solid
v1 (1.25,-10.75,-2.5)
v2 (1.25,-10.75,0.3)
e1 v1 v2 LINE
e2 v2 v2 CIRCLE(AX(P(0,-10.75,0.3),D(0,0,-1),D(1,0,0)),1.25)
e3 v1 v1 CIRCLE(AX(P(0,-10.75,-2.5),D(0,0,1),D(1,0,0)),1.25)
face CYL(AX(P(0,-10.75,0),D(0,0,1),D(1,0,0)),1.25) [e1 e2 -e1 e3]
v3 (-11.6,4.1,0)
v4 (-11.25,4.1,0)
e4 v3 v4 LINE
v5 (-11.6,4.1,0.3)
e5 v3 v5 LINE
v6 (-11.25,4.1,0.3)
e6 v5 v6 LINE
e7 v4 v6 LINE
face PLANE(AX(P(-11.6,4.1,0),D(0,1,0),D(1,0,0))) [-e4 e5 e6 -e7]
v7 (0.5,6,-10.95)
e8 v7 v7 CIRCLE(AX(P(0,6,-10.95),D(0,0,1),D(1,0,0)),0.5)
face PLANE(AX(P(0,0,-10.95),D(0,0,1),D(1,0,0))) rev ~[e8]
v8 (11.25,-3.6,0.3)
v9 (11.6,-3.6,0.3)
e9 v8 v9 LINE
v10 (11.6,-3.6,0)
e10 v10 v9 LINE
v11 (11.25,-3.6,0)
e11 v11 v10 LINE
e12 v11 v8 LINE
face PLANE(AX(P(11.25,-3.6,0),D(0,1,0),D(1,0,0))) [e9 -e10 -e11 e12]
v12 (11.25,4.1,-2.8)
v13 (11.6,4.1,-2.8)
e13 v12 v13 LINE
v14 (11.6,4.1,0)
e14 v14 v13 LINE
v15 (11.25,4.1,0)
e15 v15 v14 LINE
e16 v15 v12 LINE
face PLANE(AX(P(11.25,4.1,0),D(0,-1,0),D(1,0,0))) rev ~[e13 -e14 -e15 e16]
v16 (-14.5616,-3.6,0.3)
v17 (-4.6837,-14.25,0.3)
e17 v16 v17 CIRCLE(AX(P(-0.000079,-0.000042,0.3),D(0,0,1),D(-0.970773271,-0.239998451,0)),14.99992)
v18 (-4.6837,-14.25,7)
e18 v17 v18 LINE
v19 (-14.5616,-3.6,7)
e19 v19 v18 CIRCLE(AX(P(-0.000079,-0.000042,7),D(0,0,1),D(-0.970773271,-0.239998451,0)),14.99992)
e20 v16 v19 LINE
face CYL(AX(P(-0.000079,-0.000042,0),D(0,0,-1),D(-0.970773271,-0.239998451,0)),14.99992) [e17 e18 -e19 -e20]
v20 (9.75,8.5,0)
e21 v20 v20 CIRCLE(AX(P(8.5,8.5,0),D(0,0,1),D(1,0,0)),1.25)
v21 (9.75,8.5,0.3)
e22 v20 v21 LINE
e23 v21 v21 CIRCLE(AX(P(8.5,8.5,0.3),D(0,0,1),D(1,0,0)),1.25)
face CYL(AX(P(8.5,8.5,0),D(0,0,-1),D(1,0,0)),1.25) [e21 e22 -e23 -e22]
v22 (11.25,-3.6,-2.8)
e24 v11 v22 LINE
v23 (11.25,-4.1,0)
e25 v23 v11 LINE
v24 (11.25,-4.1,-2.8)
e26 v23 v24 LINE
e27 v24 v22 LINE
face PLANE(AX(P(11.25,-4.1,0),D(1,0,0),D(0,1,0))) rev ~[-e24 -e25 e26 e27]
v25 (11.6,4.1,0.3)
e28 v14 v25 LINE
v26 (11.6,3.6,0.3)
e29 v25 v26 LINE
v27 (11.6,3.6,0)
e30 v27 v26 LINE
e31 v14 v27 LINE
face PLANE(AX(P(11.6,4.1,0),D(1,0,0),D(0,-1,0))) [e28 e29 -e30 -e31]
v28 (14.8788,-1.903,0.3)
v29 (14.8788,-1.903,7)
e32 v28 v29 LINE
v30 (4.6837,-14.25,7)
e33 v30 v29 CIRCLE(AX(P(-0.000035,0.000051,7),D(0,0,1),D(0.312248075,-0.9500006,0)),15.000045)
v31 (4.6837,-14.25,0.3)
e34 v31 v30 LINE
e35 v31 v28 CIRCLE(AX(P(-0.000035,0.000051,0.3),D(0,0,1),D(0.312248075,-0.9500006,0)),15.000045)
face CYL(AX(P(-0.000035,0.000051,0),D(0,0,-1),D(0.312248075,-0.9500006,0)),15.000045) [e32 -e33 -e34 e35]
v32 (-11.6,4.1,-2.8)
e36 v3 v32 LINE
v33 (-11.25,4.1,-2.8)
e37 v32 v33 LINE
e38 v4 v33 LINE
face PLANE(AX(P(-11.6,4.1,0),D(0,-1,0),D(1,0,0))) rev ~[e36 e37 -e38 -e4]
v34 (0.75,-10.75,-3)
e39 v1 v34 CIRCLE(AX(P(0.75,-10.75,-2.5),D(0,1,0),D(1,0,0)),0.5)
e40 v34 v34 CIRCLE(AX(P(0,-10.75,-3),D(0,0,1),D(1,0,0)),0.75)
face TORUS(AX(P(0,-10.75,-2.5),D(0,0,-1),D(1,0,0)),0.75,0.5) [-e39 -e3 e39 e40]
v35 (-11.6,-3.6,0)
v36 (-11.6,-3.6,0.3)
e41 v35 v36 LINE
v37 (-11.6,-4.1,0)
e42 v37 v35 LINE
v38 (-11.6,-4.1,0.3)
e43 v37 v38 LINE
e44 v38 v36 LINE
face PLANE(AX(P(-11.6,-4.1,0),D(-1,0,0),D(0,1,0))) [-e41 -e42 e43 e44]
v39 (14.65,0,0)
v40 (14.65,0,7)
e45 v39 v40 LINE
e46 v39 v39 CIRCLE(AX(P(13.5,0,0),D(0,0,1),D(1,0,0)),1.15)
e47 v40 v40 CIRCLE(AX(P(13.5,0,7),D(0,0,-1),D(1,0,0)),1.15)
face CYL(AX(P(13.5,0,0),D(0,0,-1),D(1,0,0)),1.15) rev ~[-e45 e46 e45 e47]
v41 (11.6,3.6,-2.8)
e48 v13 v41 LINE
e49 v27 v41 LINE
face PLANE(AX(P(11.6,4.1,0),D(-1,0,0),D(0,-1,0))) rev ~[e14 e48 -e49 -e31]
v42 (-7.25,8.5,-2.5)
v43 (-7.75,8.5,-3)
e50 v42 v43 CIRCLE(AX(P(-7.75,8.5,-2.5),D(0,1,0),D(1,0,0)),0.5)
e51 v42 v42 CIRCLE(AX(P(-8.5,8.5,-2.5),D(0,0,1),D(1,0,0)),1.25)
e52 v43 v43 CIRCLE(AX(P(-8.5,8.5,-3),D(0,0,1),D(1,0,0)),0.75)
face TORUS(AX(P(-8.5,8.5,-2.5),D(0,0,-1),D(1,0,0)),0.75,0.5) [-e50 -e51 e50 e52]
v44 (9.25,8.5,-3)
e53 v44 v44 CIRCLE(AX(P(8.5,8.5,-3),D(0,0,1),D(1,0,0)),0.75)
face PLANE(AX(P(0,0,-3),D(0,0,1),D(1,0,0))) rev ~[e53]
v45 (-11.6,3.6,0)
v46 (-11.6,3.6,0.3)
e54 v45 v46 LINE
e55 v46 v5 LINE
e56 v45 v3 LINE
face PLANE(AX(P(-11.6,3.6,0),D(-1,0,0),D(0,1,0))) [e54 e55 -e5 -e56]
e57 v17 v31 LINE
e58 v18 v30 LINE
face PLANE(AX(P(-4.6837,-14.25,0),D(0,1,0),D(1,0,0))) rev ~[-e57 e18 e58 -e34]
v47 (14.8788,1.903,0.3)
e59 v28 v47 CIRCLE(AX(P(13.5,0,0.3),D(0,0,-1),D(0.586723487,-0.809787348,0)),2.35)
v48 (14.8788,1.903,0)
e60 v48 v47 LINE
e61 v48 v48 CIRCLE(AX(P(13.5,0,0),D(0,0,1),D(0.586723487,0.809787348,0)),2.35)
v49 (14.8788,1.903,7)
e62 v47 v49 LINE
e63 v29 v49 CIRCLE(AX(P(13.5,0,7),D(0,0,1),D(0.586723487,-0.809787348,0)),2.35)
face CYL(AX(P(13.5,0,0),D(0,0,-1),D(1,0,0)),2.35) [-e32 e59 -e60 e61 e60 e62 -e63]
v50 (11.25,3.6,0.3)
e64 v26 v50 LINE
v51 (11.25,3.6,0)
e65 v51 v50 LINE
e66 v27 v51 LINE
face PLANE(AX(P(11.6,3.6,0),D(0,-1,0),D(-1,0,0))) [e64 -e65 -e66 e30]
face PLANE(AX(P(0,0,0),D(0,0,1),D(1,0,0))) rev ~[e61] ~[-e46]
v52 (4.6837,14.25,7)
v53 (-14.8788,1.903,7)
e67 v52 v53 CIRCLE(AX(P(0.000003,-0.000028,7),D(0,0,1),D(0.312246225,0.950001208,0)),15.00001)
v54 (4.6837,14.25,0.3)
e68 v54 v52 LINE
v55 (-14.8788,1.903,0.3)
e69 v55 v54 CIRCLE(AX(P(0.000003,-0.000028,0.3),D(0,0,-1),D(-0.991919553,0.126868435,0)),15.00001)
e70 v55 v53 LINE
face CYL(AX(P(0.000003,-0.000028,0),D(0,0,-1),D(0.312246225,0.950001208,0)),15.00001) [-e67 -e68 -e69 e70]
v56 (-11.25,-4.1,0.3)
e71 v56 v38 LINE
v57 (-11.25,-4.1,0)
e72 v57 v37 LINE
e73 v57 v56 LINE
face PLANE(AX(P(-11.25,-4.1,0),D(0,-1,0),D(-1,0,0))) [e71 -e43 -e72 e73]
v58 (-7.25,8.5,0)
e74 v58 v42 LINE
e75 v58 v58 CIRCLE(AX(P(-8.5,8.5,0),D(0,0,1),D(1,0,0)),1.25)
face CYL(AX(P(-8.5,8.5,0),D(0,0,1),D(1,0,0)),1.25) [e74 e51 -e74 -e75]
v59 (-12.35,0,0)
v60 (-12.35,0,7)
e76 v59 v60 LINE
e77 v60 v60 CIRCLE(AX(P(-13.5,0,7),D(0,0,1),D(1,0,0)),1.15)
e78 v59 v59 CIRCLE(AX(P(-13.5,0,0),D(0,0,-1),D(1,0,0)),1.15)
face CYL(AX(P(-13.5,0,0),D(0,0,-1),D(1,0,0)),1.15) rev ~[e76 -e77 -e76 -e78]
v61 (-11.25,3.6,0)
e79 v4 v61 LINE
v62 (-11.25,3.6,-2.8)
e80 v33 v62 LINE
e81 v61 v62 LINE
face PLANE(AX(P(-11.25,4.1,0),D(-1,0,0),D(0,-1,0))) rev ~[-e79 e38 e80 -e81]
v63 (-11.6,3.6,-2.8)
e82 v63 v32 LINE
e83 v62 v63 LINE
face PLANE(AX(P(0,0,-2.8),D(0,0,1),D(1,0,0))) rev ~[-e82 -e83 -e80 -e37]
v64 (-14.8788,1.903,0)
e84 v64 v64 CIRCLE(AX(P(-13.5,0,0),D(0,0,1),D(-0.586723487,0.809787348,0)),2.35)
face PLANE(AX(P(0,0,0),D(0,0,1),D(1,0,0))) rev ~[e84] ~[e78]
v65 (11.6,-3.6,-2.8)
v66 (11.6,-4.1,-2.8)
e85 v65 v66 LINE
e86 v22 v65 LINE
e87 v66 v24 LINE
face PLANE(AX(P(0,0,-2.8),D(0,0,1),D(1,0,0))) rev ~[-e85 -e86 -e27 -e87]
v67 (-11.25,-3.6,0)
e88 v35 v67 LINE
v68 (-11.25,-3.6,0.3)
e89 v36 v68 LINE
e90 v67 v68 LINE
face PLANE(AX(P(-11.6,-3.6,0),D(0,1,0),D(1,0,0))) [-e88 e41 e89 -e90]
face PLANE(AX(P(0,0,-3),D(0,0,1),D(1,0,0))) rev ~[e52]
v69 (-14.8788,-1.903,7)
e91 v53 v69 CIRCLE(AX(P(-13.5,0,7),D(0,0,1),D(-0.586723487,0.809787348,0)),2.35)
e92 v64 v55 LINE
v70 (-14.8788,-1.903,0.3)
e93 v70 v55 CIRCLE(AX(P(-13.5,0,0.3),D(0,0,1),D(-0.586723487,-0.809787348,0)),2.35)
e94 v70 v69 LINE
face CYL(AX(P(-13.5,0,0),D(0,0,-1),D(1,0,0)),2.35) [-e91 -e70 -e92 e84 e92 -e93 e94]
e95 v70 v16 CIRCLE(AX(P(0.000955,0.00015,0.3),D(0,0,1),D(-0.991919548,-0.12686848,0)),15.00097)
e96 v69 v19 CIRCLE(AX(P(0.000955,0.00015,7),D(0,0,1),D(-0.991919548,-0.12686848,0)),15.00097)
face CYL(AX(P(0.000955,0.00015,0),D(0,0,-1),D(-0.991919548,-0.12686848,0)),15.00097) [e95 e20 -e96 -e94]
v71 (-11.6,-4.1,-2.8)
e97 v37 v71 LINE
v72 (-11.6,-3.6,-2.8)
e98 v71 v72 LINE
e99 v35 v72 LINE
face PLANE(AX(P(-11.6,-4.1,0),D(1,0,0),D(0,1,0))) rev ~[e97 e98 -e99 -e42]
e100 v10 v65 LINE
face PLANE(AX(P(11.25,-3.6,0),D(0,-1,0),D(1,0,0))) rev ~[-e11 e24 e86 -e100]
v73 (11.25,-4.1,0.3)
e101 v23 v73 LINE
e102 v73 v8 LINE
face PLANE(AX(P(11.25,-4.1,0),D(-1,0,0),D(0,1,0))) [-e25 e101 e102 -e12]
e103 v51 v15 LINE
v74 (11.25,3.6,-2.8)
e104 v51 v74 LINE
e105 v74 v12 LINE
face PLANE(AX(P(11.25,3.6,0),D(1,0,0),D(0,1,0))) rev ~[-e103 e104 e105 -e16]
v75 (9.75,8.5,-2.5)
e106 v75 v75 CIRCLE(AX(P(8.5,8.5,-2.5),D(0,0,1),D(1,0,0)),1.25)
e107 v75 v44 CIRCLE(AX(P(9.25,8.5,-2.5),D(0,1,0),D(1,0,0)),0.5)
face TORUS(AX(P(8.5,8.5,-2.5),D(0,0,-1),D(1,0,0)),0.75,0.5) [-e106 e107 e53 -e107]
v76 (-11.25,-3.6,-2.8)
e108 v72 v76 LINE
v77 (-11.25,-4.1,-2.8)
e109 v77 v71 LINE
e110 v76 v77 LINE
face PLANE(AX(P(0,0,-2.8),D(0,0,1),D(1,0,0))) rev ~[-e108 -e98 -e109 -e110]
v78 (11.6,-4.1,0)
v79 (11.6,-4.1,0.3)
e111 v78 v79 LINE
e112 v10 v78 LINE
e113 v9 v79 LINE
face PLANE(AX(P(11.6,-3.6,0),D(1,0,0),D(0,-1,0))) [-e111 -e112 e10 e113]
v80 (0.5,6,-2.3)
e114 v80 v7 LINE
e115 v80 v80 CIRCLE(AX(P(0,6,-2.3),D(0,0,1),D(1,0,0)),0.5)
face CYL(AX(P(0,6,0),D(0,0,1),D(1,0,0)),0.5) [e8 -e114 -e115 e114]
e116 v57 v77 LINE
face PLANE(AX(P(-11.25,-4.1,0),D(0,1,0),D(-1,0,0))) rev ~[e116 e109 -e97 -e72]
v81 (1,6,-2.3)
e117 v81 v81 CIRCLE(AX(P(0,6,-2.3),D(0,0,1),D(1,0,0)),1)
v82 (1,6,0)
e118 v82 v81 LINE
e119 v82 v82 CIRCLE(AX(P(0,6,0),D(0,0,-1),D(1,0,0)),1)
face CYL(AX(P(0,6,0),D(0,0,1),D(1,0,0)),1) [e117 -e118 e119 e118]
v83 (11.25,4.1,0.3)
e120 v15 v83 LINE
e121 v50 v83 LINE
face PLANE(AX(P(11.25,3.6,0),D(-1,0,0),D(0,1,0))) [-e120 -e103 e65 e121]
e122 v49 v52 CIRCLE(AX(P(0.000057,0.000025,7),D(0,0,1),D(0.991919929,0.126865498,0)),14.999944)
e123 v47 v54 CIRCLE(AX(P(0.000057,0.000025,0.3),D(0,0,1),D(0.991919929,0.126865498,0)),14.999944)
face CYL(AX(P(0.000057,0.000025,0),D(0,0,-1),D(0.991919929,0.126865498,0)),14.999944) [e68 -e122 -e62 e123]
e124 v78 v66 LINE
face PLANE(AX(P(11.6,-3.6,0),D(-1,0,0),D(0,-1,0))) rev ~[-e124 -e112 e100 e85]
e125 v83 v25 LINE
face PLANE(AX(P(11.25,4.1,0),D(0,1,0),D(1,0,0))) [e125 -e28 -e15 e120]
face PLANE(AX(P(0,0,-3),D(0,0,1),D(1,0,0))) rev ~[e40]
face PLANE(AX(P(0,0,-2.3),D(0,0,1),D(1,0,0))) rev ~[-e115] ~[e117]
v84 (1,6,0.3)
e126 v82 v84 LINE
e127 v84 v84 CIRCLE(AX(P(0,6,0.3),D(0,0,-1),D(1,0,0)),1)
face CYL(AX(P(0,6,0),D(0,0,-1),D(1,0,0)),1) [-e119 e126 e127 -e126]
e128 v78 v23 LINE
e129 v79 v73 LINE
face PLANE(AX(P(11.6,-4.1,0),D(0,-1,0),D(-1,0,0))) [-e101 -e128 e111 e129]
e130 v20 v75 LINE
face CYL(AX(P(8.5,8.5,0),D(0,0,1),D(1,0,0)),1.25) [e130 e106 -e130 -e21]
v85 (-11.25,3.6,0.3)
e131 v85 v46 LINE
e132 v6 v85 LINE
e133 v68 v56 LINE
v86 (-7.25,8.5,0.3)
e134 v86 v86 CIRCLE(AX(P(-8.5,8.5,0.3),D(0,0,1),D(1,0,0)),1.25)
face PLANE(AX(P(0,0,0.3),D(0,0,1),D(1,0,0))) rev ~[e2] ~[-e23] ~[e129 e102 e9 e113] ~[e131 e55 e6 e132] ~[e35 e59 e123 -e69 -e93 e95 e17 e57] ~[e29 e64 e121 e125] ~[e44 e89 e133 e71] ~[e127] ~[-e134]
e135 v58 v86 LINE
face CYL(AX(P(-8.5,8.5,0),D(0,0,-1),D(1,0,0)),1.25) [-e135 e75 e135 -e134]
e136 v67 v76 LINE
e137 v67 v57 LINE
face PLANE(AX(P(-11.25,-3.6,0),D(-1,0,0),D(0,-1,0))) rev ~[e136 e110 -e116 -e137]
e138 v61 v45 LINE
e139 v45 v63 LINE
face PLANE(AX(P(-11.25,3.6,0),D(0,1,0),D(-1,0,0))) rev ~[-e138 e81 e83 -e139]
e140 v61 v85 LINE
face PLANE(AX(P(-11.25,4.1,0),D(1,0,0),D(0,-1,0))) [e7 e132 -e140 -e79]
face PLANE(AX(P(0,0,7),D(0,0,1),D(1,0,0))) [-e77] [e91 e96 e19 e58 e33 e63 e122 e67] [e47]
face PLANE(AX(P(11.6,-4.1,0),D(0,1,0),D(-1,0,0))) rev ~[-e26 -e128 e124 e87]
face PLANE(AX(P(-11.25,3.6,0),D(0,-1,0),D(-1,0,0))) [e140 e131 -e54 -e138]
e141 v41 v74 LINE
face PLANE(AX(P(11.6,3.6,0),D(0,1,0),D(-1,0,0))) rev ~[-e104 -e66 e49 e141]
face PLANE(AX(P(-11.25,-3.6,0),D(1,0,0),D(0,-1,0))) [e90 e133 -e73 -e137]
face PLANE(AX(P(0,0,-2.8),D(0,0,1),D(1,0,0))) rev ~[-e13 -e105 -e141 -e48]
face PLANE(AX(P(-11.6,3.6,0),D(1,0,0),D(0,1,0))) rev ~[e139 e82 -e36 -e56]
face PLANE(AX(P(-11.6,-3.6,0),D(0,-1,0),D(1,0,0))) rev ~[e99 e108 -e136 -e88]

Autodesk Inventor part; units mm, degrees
ref_plane "YZ Plane" through (0, 0, 0) normal (1, 0, 0) x (0, 1, 0)
ref_plane "XZ Plane" through (0, 0, 0) normal (0, 1, 0) x (-1, 0, 0)
ref_plane "XY Plane" through (0, 0, 0) normal (0, 0, 1) x (1, 0, 0)
sketch "Sketch1" plane through (0, 0, 0) normal (0, 0, 1) x (1, 0, 0)
  line L0 (-24.6776, 0) -> (23.5544, 0) projected
  line L1 (0, -22.6406) -> (0, 25.7747) projected
  circle A0 centre (-13.5, 0) radius 1.15
  circle A1 centre (-13.5, 0) radius 2.35
  circle A2 centre (13.5, 0) radius 1.15
  circle A3 centre (13.5, 0) radius 2.35
  circle A4 centre (0, 6) radius 1
  circle A5 centre (0, 6) radius 0.5
  circle A6 centre (0, -10.75) radius 1.25
  circle A7 centre (-8.5, 8.5) radius 1.25
  circle A8 centre (8.5, 8.5) radius 1.25
  line L2 (-11.6, -3.6) -> (-11.25, -3.6)
  line L3 (-11.25, -3.6) -> (-11.25, -4.1)
  line L4 (-11.25, -4.1) -> (-11.6, -4.1)
  line L5 (-11.6, -4.1) -> (-11.6, -3.6)
  line L6 (11.25, -4.1) -> (11.25, -3.6)
  line L7 (11.25, -3.6) -> (11.6, -3.6)
  line L8 (11.6, -3.6) -> (11.6, -4.1)
  line L9 (11.6, -4.1) -> (11.25, -4.1)
  line L10 (-11.6, 3.6) -> (-11.6, 4.1)
  line L11 (-11.6, 4.1) -> (-11.25, 4.1)
  line L12 (-11.25, 4.1) -> (-11.25, 3.6)
  line L13 (-11.25, 3.6) -> (-11.6, 3.6)
  line L14 (11.25, 3.6) -> (11.25, 4.1)
  line L15 (11.25, 4.1) -> (11.6, 4.1)
  line L16 (11.6, 4.1) -> (11.6, 3.6)
  line L17 (11.6, 3.6) -> (11.25, 3.6)
  arc A9 (14.8788, 1.903) -> (4.6837, 14.25) centre (0, 0) ccw
  arc A10 (4.6837, 14.25) -> (-14.8788, 1.903) centre (0, 0) ccw
  arc A11 (4.6837, -14.25) -> (14.8788, -1.903) centre (0, 0) ccw
  circle A12 centre (5.4353, -14.25) radius 0.1148
  line L18 (-4.6837, -14.25) -> (4.6837, -14.25)
  arc A13 (14.8788, 1.903) -> (-14.8788, 1.903) centre (0, 0) ccw
  arc A14 (-14.8788, -1.903) -> (-14.5616, -3.6) centre (0, 0) ccw
  arc A15 (-14.5616, -3.6) -> (-4.6837, -14.25) centre (0, 0) ccw
  arc A16 (-14.5616, 3.6) -> (-14.8788, 1.903) centre (0, 0) ccw
  arc A17 (0, 15) -> (-14.5616, 3.6) centre (0, 0) ccw
  arc A18 (-14.5616, 3.6) -> (-14.8788, 1.903) centre (0, 0) ccw
  point P0 (-15.6415, -0.9678)
  point P1 (0, -15.6714)
  point P2 (15.1605, -1.6629)
  dimension "d2" = 2.3
  dimension "d3" = 4.7
  dimension "d4" = 13.5
  dimension "d7" = 360
  dimension "d9" = 2
  dimension "d10" = 1
  dimension "d11" = 6
  dimension "d12" = 2.5
  dimension "d13" = 10.75
  dimension "d14" = 19.25
  dimension "d16" = 8.5
  dimension "d17" = 0.35
  dimension "d18" = 0.5
  dimension "d19" = 11.25
  dimension "d20" = 3.6
  dimension "d23" = 22.85
  dimension "d26" = 7.7
  dimension "d48" = 14.25
extrude "Extrusion1" add sketch "Sketch1" along normal blind 7 contours A0 L0 A1 | L0 A1 A0 | A1 A10 L1 A4 L0 | L0 L1 A6 L18 A15 A14 A1 | L1 A4 A10 A9 A3 L0 | L0 A3 A11 L18 L1 A6 | A3 L0 A2 | L0 A2 A3 | A6 L1 | L1 A6 | A4 L1 A5 | L1 A5 A4 | A5 L1 | L1 A5 | A7 | A8 | L2 L3 L4 L5 | L6 L7 L8 L9 | L10 L11 L12 L13 | L14 L15 L16 L17
sketch "Sketch2" plane through (0, 0, 0) normal (0, 0, -1) x (-1, 0, 0)
  point P0 (0, 0)
extrude "Extrusion2" add sketch "Sketch1" against normal blind 3 contours A6 L1 | L1 A6 | A7 | A8
fillet "Fillet1" radius 0.5 3 edges at (7.25, 8.5, -3) (-1.25, -10.75, -3) (-9.75, 8.5, -3)
extrude "Extrusion3" add sketch "Sketch1" against normal blind 10.95 contours A5 L1 | L1 A5
extrude "Extrusion4" add sketch "Sketch1" against normal blind 2.3 contours A4 L1 A5 | L1 A5 A4
extrude "Extrusion5" add sketch "Sketch1" against normal blind 2.8 contours L2 L3 L4 L5 | L6 L7 L8 L9 | L10 L11 L12 L13 | L14 L15 L16 L17
extrude "Extrusion6" cut sketch "Sketch1" along normal blind 0.3 contours A1 A10 L1 A4 L0 | L0 L1 A6 L18 A15 A14 A1 | L1 A4 A10 A9 A3 L0 | L0 A3 A11 L18 L1 A6
equation "\"d23\" = 2 * d19 + d17"
equation "\"d26\" = 2 * d20 + d18"
properties part number "VID26" material "PBT Plastic"
